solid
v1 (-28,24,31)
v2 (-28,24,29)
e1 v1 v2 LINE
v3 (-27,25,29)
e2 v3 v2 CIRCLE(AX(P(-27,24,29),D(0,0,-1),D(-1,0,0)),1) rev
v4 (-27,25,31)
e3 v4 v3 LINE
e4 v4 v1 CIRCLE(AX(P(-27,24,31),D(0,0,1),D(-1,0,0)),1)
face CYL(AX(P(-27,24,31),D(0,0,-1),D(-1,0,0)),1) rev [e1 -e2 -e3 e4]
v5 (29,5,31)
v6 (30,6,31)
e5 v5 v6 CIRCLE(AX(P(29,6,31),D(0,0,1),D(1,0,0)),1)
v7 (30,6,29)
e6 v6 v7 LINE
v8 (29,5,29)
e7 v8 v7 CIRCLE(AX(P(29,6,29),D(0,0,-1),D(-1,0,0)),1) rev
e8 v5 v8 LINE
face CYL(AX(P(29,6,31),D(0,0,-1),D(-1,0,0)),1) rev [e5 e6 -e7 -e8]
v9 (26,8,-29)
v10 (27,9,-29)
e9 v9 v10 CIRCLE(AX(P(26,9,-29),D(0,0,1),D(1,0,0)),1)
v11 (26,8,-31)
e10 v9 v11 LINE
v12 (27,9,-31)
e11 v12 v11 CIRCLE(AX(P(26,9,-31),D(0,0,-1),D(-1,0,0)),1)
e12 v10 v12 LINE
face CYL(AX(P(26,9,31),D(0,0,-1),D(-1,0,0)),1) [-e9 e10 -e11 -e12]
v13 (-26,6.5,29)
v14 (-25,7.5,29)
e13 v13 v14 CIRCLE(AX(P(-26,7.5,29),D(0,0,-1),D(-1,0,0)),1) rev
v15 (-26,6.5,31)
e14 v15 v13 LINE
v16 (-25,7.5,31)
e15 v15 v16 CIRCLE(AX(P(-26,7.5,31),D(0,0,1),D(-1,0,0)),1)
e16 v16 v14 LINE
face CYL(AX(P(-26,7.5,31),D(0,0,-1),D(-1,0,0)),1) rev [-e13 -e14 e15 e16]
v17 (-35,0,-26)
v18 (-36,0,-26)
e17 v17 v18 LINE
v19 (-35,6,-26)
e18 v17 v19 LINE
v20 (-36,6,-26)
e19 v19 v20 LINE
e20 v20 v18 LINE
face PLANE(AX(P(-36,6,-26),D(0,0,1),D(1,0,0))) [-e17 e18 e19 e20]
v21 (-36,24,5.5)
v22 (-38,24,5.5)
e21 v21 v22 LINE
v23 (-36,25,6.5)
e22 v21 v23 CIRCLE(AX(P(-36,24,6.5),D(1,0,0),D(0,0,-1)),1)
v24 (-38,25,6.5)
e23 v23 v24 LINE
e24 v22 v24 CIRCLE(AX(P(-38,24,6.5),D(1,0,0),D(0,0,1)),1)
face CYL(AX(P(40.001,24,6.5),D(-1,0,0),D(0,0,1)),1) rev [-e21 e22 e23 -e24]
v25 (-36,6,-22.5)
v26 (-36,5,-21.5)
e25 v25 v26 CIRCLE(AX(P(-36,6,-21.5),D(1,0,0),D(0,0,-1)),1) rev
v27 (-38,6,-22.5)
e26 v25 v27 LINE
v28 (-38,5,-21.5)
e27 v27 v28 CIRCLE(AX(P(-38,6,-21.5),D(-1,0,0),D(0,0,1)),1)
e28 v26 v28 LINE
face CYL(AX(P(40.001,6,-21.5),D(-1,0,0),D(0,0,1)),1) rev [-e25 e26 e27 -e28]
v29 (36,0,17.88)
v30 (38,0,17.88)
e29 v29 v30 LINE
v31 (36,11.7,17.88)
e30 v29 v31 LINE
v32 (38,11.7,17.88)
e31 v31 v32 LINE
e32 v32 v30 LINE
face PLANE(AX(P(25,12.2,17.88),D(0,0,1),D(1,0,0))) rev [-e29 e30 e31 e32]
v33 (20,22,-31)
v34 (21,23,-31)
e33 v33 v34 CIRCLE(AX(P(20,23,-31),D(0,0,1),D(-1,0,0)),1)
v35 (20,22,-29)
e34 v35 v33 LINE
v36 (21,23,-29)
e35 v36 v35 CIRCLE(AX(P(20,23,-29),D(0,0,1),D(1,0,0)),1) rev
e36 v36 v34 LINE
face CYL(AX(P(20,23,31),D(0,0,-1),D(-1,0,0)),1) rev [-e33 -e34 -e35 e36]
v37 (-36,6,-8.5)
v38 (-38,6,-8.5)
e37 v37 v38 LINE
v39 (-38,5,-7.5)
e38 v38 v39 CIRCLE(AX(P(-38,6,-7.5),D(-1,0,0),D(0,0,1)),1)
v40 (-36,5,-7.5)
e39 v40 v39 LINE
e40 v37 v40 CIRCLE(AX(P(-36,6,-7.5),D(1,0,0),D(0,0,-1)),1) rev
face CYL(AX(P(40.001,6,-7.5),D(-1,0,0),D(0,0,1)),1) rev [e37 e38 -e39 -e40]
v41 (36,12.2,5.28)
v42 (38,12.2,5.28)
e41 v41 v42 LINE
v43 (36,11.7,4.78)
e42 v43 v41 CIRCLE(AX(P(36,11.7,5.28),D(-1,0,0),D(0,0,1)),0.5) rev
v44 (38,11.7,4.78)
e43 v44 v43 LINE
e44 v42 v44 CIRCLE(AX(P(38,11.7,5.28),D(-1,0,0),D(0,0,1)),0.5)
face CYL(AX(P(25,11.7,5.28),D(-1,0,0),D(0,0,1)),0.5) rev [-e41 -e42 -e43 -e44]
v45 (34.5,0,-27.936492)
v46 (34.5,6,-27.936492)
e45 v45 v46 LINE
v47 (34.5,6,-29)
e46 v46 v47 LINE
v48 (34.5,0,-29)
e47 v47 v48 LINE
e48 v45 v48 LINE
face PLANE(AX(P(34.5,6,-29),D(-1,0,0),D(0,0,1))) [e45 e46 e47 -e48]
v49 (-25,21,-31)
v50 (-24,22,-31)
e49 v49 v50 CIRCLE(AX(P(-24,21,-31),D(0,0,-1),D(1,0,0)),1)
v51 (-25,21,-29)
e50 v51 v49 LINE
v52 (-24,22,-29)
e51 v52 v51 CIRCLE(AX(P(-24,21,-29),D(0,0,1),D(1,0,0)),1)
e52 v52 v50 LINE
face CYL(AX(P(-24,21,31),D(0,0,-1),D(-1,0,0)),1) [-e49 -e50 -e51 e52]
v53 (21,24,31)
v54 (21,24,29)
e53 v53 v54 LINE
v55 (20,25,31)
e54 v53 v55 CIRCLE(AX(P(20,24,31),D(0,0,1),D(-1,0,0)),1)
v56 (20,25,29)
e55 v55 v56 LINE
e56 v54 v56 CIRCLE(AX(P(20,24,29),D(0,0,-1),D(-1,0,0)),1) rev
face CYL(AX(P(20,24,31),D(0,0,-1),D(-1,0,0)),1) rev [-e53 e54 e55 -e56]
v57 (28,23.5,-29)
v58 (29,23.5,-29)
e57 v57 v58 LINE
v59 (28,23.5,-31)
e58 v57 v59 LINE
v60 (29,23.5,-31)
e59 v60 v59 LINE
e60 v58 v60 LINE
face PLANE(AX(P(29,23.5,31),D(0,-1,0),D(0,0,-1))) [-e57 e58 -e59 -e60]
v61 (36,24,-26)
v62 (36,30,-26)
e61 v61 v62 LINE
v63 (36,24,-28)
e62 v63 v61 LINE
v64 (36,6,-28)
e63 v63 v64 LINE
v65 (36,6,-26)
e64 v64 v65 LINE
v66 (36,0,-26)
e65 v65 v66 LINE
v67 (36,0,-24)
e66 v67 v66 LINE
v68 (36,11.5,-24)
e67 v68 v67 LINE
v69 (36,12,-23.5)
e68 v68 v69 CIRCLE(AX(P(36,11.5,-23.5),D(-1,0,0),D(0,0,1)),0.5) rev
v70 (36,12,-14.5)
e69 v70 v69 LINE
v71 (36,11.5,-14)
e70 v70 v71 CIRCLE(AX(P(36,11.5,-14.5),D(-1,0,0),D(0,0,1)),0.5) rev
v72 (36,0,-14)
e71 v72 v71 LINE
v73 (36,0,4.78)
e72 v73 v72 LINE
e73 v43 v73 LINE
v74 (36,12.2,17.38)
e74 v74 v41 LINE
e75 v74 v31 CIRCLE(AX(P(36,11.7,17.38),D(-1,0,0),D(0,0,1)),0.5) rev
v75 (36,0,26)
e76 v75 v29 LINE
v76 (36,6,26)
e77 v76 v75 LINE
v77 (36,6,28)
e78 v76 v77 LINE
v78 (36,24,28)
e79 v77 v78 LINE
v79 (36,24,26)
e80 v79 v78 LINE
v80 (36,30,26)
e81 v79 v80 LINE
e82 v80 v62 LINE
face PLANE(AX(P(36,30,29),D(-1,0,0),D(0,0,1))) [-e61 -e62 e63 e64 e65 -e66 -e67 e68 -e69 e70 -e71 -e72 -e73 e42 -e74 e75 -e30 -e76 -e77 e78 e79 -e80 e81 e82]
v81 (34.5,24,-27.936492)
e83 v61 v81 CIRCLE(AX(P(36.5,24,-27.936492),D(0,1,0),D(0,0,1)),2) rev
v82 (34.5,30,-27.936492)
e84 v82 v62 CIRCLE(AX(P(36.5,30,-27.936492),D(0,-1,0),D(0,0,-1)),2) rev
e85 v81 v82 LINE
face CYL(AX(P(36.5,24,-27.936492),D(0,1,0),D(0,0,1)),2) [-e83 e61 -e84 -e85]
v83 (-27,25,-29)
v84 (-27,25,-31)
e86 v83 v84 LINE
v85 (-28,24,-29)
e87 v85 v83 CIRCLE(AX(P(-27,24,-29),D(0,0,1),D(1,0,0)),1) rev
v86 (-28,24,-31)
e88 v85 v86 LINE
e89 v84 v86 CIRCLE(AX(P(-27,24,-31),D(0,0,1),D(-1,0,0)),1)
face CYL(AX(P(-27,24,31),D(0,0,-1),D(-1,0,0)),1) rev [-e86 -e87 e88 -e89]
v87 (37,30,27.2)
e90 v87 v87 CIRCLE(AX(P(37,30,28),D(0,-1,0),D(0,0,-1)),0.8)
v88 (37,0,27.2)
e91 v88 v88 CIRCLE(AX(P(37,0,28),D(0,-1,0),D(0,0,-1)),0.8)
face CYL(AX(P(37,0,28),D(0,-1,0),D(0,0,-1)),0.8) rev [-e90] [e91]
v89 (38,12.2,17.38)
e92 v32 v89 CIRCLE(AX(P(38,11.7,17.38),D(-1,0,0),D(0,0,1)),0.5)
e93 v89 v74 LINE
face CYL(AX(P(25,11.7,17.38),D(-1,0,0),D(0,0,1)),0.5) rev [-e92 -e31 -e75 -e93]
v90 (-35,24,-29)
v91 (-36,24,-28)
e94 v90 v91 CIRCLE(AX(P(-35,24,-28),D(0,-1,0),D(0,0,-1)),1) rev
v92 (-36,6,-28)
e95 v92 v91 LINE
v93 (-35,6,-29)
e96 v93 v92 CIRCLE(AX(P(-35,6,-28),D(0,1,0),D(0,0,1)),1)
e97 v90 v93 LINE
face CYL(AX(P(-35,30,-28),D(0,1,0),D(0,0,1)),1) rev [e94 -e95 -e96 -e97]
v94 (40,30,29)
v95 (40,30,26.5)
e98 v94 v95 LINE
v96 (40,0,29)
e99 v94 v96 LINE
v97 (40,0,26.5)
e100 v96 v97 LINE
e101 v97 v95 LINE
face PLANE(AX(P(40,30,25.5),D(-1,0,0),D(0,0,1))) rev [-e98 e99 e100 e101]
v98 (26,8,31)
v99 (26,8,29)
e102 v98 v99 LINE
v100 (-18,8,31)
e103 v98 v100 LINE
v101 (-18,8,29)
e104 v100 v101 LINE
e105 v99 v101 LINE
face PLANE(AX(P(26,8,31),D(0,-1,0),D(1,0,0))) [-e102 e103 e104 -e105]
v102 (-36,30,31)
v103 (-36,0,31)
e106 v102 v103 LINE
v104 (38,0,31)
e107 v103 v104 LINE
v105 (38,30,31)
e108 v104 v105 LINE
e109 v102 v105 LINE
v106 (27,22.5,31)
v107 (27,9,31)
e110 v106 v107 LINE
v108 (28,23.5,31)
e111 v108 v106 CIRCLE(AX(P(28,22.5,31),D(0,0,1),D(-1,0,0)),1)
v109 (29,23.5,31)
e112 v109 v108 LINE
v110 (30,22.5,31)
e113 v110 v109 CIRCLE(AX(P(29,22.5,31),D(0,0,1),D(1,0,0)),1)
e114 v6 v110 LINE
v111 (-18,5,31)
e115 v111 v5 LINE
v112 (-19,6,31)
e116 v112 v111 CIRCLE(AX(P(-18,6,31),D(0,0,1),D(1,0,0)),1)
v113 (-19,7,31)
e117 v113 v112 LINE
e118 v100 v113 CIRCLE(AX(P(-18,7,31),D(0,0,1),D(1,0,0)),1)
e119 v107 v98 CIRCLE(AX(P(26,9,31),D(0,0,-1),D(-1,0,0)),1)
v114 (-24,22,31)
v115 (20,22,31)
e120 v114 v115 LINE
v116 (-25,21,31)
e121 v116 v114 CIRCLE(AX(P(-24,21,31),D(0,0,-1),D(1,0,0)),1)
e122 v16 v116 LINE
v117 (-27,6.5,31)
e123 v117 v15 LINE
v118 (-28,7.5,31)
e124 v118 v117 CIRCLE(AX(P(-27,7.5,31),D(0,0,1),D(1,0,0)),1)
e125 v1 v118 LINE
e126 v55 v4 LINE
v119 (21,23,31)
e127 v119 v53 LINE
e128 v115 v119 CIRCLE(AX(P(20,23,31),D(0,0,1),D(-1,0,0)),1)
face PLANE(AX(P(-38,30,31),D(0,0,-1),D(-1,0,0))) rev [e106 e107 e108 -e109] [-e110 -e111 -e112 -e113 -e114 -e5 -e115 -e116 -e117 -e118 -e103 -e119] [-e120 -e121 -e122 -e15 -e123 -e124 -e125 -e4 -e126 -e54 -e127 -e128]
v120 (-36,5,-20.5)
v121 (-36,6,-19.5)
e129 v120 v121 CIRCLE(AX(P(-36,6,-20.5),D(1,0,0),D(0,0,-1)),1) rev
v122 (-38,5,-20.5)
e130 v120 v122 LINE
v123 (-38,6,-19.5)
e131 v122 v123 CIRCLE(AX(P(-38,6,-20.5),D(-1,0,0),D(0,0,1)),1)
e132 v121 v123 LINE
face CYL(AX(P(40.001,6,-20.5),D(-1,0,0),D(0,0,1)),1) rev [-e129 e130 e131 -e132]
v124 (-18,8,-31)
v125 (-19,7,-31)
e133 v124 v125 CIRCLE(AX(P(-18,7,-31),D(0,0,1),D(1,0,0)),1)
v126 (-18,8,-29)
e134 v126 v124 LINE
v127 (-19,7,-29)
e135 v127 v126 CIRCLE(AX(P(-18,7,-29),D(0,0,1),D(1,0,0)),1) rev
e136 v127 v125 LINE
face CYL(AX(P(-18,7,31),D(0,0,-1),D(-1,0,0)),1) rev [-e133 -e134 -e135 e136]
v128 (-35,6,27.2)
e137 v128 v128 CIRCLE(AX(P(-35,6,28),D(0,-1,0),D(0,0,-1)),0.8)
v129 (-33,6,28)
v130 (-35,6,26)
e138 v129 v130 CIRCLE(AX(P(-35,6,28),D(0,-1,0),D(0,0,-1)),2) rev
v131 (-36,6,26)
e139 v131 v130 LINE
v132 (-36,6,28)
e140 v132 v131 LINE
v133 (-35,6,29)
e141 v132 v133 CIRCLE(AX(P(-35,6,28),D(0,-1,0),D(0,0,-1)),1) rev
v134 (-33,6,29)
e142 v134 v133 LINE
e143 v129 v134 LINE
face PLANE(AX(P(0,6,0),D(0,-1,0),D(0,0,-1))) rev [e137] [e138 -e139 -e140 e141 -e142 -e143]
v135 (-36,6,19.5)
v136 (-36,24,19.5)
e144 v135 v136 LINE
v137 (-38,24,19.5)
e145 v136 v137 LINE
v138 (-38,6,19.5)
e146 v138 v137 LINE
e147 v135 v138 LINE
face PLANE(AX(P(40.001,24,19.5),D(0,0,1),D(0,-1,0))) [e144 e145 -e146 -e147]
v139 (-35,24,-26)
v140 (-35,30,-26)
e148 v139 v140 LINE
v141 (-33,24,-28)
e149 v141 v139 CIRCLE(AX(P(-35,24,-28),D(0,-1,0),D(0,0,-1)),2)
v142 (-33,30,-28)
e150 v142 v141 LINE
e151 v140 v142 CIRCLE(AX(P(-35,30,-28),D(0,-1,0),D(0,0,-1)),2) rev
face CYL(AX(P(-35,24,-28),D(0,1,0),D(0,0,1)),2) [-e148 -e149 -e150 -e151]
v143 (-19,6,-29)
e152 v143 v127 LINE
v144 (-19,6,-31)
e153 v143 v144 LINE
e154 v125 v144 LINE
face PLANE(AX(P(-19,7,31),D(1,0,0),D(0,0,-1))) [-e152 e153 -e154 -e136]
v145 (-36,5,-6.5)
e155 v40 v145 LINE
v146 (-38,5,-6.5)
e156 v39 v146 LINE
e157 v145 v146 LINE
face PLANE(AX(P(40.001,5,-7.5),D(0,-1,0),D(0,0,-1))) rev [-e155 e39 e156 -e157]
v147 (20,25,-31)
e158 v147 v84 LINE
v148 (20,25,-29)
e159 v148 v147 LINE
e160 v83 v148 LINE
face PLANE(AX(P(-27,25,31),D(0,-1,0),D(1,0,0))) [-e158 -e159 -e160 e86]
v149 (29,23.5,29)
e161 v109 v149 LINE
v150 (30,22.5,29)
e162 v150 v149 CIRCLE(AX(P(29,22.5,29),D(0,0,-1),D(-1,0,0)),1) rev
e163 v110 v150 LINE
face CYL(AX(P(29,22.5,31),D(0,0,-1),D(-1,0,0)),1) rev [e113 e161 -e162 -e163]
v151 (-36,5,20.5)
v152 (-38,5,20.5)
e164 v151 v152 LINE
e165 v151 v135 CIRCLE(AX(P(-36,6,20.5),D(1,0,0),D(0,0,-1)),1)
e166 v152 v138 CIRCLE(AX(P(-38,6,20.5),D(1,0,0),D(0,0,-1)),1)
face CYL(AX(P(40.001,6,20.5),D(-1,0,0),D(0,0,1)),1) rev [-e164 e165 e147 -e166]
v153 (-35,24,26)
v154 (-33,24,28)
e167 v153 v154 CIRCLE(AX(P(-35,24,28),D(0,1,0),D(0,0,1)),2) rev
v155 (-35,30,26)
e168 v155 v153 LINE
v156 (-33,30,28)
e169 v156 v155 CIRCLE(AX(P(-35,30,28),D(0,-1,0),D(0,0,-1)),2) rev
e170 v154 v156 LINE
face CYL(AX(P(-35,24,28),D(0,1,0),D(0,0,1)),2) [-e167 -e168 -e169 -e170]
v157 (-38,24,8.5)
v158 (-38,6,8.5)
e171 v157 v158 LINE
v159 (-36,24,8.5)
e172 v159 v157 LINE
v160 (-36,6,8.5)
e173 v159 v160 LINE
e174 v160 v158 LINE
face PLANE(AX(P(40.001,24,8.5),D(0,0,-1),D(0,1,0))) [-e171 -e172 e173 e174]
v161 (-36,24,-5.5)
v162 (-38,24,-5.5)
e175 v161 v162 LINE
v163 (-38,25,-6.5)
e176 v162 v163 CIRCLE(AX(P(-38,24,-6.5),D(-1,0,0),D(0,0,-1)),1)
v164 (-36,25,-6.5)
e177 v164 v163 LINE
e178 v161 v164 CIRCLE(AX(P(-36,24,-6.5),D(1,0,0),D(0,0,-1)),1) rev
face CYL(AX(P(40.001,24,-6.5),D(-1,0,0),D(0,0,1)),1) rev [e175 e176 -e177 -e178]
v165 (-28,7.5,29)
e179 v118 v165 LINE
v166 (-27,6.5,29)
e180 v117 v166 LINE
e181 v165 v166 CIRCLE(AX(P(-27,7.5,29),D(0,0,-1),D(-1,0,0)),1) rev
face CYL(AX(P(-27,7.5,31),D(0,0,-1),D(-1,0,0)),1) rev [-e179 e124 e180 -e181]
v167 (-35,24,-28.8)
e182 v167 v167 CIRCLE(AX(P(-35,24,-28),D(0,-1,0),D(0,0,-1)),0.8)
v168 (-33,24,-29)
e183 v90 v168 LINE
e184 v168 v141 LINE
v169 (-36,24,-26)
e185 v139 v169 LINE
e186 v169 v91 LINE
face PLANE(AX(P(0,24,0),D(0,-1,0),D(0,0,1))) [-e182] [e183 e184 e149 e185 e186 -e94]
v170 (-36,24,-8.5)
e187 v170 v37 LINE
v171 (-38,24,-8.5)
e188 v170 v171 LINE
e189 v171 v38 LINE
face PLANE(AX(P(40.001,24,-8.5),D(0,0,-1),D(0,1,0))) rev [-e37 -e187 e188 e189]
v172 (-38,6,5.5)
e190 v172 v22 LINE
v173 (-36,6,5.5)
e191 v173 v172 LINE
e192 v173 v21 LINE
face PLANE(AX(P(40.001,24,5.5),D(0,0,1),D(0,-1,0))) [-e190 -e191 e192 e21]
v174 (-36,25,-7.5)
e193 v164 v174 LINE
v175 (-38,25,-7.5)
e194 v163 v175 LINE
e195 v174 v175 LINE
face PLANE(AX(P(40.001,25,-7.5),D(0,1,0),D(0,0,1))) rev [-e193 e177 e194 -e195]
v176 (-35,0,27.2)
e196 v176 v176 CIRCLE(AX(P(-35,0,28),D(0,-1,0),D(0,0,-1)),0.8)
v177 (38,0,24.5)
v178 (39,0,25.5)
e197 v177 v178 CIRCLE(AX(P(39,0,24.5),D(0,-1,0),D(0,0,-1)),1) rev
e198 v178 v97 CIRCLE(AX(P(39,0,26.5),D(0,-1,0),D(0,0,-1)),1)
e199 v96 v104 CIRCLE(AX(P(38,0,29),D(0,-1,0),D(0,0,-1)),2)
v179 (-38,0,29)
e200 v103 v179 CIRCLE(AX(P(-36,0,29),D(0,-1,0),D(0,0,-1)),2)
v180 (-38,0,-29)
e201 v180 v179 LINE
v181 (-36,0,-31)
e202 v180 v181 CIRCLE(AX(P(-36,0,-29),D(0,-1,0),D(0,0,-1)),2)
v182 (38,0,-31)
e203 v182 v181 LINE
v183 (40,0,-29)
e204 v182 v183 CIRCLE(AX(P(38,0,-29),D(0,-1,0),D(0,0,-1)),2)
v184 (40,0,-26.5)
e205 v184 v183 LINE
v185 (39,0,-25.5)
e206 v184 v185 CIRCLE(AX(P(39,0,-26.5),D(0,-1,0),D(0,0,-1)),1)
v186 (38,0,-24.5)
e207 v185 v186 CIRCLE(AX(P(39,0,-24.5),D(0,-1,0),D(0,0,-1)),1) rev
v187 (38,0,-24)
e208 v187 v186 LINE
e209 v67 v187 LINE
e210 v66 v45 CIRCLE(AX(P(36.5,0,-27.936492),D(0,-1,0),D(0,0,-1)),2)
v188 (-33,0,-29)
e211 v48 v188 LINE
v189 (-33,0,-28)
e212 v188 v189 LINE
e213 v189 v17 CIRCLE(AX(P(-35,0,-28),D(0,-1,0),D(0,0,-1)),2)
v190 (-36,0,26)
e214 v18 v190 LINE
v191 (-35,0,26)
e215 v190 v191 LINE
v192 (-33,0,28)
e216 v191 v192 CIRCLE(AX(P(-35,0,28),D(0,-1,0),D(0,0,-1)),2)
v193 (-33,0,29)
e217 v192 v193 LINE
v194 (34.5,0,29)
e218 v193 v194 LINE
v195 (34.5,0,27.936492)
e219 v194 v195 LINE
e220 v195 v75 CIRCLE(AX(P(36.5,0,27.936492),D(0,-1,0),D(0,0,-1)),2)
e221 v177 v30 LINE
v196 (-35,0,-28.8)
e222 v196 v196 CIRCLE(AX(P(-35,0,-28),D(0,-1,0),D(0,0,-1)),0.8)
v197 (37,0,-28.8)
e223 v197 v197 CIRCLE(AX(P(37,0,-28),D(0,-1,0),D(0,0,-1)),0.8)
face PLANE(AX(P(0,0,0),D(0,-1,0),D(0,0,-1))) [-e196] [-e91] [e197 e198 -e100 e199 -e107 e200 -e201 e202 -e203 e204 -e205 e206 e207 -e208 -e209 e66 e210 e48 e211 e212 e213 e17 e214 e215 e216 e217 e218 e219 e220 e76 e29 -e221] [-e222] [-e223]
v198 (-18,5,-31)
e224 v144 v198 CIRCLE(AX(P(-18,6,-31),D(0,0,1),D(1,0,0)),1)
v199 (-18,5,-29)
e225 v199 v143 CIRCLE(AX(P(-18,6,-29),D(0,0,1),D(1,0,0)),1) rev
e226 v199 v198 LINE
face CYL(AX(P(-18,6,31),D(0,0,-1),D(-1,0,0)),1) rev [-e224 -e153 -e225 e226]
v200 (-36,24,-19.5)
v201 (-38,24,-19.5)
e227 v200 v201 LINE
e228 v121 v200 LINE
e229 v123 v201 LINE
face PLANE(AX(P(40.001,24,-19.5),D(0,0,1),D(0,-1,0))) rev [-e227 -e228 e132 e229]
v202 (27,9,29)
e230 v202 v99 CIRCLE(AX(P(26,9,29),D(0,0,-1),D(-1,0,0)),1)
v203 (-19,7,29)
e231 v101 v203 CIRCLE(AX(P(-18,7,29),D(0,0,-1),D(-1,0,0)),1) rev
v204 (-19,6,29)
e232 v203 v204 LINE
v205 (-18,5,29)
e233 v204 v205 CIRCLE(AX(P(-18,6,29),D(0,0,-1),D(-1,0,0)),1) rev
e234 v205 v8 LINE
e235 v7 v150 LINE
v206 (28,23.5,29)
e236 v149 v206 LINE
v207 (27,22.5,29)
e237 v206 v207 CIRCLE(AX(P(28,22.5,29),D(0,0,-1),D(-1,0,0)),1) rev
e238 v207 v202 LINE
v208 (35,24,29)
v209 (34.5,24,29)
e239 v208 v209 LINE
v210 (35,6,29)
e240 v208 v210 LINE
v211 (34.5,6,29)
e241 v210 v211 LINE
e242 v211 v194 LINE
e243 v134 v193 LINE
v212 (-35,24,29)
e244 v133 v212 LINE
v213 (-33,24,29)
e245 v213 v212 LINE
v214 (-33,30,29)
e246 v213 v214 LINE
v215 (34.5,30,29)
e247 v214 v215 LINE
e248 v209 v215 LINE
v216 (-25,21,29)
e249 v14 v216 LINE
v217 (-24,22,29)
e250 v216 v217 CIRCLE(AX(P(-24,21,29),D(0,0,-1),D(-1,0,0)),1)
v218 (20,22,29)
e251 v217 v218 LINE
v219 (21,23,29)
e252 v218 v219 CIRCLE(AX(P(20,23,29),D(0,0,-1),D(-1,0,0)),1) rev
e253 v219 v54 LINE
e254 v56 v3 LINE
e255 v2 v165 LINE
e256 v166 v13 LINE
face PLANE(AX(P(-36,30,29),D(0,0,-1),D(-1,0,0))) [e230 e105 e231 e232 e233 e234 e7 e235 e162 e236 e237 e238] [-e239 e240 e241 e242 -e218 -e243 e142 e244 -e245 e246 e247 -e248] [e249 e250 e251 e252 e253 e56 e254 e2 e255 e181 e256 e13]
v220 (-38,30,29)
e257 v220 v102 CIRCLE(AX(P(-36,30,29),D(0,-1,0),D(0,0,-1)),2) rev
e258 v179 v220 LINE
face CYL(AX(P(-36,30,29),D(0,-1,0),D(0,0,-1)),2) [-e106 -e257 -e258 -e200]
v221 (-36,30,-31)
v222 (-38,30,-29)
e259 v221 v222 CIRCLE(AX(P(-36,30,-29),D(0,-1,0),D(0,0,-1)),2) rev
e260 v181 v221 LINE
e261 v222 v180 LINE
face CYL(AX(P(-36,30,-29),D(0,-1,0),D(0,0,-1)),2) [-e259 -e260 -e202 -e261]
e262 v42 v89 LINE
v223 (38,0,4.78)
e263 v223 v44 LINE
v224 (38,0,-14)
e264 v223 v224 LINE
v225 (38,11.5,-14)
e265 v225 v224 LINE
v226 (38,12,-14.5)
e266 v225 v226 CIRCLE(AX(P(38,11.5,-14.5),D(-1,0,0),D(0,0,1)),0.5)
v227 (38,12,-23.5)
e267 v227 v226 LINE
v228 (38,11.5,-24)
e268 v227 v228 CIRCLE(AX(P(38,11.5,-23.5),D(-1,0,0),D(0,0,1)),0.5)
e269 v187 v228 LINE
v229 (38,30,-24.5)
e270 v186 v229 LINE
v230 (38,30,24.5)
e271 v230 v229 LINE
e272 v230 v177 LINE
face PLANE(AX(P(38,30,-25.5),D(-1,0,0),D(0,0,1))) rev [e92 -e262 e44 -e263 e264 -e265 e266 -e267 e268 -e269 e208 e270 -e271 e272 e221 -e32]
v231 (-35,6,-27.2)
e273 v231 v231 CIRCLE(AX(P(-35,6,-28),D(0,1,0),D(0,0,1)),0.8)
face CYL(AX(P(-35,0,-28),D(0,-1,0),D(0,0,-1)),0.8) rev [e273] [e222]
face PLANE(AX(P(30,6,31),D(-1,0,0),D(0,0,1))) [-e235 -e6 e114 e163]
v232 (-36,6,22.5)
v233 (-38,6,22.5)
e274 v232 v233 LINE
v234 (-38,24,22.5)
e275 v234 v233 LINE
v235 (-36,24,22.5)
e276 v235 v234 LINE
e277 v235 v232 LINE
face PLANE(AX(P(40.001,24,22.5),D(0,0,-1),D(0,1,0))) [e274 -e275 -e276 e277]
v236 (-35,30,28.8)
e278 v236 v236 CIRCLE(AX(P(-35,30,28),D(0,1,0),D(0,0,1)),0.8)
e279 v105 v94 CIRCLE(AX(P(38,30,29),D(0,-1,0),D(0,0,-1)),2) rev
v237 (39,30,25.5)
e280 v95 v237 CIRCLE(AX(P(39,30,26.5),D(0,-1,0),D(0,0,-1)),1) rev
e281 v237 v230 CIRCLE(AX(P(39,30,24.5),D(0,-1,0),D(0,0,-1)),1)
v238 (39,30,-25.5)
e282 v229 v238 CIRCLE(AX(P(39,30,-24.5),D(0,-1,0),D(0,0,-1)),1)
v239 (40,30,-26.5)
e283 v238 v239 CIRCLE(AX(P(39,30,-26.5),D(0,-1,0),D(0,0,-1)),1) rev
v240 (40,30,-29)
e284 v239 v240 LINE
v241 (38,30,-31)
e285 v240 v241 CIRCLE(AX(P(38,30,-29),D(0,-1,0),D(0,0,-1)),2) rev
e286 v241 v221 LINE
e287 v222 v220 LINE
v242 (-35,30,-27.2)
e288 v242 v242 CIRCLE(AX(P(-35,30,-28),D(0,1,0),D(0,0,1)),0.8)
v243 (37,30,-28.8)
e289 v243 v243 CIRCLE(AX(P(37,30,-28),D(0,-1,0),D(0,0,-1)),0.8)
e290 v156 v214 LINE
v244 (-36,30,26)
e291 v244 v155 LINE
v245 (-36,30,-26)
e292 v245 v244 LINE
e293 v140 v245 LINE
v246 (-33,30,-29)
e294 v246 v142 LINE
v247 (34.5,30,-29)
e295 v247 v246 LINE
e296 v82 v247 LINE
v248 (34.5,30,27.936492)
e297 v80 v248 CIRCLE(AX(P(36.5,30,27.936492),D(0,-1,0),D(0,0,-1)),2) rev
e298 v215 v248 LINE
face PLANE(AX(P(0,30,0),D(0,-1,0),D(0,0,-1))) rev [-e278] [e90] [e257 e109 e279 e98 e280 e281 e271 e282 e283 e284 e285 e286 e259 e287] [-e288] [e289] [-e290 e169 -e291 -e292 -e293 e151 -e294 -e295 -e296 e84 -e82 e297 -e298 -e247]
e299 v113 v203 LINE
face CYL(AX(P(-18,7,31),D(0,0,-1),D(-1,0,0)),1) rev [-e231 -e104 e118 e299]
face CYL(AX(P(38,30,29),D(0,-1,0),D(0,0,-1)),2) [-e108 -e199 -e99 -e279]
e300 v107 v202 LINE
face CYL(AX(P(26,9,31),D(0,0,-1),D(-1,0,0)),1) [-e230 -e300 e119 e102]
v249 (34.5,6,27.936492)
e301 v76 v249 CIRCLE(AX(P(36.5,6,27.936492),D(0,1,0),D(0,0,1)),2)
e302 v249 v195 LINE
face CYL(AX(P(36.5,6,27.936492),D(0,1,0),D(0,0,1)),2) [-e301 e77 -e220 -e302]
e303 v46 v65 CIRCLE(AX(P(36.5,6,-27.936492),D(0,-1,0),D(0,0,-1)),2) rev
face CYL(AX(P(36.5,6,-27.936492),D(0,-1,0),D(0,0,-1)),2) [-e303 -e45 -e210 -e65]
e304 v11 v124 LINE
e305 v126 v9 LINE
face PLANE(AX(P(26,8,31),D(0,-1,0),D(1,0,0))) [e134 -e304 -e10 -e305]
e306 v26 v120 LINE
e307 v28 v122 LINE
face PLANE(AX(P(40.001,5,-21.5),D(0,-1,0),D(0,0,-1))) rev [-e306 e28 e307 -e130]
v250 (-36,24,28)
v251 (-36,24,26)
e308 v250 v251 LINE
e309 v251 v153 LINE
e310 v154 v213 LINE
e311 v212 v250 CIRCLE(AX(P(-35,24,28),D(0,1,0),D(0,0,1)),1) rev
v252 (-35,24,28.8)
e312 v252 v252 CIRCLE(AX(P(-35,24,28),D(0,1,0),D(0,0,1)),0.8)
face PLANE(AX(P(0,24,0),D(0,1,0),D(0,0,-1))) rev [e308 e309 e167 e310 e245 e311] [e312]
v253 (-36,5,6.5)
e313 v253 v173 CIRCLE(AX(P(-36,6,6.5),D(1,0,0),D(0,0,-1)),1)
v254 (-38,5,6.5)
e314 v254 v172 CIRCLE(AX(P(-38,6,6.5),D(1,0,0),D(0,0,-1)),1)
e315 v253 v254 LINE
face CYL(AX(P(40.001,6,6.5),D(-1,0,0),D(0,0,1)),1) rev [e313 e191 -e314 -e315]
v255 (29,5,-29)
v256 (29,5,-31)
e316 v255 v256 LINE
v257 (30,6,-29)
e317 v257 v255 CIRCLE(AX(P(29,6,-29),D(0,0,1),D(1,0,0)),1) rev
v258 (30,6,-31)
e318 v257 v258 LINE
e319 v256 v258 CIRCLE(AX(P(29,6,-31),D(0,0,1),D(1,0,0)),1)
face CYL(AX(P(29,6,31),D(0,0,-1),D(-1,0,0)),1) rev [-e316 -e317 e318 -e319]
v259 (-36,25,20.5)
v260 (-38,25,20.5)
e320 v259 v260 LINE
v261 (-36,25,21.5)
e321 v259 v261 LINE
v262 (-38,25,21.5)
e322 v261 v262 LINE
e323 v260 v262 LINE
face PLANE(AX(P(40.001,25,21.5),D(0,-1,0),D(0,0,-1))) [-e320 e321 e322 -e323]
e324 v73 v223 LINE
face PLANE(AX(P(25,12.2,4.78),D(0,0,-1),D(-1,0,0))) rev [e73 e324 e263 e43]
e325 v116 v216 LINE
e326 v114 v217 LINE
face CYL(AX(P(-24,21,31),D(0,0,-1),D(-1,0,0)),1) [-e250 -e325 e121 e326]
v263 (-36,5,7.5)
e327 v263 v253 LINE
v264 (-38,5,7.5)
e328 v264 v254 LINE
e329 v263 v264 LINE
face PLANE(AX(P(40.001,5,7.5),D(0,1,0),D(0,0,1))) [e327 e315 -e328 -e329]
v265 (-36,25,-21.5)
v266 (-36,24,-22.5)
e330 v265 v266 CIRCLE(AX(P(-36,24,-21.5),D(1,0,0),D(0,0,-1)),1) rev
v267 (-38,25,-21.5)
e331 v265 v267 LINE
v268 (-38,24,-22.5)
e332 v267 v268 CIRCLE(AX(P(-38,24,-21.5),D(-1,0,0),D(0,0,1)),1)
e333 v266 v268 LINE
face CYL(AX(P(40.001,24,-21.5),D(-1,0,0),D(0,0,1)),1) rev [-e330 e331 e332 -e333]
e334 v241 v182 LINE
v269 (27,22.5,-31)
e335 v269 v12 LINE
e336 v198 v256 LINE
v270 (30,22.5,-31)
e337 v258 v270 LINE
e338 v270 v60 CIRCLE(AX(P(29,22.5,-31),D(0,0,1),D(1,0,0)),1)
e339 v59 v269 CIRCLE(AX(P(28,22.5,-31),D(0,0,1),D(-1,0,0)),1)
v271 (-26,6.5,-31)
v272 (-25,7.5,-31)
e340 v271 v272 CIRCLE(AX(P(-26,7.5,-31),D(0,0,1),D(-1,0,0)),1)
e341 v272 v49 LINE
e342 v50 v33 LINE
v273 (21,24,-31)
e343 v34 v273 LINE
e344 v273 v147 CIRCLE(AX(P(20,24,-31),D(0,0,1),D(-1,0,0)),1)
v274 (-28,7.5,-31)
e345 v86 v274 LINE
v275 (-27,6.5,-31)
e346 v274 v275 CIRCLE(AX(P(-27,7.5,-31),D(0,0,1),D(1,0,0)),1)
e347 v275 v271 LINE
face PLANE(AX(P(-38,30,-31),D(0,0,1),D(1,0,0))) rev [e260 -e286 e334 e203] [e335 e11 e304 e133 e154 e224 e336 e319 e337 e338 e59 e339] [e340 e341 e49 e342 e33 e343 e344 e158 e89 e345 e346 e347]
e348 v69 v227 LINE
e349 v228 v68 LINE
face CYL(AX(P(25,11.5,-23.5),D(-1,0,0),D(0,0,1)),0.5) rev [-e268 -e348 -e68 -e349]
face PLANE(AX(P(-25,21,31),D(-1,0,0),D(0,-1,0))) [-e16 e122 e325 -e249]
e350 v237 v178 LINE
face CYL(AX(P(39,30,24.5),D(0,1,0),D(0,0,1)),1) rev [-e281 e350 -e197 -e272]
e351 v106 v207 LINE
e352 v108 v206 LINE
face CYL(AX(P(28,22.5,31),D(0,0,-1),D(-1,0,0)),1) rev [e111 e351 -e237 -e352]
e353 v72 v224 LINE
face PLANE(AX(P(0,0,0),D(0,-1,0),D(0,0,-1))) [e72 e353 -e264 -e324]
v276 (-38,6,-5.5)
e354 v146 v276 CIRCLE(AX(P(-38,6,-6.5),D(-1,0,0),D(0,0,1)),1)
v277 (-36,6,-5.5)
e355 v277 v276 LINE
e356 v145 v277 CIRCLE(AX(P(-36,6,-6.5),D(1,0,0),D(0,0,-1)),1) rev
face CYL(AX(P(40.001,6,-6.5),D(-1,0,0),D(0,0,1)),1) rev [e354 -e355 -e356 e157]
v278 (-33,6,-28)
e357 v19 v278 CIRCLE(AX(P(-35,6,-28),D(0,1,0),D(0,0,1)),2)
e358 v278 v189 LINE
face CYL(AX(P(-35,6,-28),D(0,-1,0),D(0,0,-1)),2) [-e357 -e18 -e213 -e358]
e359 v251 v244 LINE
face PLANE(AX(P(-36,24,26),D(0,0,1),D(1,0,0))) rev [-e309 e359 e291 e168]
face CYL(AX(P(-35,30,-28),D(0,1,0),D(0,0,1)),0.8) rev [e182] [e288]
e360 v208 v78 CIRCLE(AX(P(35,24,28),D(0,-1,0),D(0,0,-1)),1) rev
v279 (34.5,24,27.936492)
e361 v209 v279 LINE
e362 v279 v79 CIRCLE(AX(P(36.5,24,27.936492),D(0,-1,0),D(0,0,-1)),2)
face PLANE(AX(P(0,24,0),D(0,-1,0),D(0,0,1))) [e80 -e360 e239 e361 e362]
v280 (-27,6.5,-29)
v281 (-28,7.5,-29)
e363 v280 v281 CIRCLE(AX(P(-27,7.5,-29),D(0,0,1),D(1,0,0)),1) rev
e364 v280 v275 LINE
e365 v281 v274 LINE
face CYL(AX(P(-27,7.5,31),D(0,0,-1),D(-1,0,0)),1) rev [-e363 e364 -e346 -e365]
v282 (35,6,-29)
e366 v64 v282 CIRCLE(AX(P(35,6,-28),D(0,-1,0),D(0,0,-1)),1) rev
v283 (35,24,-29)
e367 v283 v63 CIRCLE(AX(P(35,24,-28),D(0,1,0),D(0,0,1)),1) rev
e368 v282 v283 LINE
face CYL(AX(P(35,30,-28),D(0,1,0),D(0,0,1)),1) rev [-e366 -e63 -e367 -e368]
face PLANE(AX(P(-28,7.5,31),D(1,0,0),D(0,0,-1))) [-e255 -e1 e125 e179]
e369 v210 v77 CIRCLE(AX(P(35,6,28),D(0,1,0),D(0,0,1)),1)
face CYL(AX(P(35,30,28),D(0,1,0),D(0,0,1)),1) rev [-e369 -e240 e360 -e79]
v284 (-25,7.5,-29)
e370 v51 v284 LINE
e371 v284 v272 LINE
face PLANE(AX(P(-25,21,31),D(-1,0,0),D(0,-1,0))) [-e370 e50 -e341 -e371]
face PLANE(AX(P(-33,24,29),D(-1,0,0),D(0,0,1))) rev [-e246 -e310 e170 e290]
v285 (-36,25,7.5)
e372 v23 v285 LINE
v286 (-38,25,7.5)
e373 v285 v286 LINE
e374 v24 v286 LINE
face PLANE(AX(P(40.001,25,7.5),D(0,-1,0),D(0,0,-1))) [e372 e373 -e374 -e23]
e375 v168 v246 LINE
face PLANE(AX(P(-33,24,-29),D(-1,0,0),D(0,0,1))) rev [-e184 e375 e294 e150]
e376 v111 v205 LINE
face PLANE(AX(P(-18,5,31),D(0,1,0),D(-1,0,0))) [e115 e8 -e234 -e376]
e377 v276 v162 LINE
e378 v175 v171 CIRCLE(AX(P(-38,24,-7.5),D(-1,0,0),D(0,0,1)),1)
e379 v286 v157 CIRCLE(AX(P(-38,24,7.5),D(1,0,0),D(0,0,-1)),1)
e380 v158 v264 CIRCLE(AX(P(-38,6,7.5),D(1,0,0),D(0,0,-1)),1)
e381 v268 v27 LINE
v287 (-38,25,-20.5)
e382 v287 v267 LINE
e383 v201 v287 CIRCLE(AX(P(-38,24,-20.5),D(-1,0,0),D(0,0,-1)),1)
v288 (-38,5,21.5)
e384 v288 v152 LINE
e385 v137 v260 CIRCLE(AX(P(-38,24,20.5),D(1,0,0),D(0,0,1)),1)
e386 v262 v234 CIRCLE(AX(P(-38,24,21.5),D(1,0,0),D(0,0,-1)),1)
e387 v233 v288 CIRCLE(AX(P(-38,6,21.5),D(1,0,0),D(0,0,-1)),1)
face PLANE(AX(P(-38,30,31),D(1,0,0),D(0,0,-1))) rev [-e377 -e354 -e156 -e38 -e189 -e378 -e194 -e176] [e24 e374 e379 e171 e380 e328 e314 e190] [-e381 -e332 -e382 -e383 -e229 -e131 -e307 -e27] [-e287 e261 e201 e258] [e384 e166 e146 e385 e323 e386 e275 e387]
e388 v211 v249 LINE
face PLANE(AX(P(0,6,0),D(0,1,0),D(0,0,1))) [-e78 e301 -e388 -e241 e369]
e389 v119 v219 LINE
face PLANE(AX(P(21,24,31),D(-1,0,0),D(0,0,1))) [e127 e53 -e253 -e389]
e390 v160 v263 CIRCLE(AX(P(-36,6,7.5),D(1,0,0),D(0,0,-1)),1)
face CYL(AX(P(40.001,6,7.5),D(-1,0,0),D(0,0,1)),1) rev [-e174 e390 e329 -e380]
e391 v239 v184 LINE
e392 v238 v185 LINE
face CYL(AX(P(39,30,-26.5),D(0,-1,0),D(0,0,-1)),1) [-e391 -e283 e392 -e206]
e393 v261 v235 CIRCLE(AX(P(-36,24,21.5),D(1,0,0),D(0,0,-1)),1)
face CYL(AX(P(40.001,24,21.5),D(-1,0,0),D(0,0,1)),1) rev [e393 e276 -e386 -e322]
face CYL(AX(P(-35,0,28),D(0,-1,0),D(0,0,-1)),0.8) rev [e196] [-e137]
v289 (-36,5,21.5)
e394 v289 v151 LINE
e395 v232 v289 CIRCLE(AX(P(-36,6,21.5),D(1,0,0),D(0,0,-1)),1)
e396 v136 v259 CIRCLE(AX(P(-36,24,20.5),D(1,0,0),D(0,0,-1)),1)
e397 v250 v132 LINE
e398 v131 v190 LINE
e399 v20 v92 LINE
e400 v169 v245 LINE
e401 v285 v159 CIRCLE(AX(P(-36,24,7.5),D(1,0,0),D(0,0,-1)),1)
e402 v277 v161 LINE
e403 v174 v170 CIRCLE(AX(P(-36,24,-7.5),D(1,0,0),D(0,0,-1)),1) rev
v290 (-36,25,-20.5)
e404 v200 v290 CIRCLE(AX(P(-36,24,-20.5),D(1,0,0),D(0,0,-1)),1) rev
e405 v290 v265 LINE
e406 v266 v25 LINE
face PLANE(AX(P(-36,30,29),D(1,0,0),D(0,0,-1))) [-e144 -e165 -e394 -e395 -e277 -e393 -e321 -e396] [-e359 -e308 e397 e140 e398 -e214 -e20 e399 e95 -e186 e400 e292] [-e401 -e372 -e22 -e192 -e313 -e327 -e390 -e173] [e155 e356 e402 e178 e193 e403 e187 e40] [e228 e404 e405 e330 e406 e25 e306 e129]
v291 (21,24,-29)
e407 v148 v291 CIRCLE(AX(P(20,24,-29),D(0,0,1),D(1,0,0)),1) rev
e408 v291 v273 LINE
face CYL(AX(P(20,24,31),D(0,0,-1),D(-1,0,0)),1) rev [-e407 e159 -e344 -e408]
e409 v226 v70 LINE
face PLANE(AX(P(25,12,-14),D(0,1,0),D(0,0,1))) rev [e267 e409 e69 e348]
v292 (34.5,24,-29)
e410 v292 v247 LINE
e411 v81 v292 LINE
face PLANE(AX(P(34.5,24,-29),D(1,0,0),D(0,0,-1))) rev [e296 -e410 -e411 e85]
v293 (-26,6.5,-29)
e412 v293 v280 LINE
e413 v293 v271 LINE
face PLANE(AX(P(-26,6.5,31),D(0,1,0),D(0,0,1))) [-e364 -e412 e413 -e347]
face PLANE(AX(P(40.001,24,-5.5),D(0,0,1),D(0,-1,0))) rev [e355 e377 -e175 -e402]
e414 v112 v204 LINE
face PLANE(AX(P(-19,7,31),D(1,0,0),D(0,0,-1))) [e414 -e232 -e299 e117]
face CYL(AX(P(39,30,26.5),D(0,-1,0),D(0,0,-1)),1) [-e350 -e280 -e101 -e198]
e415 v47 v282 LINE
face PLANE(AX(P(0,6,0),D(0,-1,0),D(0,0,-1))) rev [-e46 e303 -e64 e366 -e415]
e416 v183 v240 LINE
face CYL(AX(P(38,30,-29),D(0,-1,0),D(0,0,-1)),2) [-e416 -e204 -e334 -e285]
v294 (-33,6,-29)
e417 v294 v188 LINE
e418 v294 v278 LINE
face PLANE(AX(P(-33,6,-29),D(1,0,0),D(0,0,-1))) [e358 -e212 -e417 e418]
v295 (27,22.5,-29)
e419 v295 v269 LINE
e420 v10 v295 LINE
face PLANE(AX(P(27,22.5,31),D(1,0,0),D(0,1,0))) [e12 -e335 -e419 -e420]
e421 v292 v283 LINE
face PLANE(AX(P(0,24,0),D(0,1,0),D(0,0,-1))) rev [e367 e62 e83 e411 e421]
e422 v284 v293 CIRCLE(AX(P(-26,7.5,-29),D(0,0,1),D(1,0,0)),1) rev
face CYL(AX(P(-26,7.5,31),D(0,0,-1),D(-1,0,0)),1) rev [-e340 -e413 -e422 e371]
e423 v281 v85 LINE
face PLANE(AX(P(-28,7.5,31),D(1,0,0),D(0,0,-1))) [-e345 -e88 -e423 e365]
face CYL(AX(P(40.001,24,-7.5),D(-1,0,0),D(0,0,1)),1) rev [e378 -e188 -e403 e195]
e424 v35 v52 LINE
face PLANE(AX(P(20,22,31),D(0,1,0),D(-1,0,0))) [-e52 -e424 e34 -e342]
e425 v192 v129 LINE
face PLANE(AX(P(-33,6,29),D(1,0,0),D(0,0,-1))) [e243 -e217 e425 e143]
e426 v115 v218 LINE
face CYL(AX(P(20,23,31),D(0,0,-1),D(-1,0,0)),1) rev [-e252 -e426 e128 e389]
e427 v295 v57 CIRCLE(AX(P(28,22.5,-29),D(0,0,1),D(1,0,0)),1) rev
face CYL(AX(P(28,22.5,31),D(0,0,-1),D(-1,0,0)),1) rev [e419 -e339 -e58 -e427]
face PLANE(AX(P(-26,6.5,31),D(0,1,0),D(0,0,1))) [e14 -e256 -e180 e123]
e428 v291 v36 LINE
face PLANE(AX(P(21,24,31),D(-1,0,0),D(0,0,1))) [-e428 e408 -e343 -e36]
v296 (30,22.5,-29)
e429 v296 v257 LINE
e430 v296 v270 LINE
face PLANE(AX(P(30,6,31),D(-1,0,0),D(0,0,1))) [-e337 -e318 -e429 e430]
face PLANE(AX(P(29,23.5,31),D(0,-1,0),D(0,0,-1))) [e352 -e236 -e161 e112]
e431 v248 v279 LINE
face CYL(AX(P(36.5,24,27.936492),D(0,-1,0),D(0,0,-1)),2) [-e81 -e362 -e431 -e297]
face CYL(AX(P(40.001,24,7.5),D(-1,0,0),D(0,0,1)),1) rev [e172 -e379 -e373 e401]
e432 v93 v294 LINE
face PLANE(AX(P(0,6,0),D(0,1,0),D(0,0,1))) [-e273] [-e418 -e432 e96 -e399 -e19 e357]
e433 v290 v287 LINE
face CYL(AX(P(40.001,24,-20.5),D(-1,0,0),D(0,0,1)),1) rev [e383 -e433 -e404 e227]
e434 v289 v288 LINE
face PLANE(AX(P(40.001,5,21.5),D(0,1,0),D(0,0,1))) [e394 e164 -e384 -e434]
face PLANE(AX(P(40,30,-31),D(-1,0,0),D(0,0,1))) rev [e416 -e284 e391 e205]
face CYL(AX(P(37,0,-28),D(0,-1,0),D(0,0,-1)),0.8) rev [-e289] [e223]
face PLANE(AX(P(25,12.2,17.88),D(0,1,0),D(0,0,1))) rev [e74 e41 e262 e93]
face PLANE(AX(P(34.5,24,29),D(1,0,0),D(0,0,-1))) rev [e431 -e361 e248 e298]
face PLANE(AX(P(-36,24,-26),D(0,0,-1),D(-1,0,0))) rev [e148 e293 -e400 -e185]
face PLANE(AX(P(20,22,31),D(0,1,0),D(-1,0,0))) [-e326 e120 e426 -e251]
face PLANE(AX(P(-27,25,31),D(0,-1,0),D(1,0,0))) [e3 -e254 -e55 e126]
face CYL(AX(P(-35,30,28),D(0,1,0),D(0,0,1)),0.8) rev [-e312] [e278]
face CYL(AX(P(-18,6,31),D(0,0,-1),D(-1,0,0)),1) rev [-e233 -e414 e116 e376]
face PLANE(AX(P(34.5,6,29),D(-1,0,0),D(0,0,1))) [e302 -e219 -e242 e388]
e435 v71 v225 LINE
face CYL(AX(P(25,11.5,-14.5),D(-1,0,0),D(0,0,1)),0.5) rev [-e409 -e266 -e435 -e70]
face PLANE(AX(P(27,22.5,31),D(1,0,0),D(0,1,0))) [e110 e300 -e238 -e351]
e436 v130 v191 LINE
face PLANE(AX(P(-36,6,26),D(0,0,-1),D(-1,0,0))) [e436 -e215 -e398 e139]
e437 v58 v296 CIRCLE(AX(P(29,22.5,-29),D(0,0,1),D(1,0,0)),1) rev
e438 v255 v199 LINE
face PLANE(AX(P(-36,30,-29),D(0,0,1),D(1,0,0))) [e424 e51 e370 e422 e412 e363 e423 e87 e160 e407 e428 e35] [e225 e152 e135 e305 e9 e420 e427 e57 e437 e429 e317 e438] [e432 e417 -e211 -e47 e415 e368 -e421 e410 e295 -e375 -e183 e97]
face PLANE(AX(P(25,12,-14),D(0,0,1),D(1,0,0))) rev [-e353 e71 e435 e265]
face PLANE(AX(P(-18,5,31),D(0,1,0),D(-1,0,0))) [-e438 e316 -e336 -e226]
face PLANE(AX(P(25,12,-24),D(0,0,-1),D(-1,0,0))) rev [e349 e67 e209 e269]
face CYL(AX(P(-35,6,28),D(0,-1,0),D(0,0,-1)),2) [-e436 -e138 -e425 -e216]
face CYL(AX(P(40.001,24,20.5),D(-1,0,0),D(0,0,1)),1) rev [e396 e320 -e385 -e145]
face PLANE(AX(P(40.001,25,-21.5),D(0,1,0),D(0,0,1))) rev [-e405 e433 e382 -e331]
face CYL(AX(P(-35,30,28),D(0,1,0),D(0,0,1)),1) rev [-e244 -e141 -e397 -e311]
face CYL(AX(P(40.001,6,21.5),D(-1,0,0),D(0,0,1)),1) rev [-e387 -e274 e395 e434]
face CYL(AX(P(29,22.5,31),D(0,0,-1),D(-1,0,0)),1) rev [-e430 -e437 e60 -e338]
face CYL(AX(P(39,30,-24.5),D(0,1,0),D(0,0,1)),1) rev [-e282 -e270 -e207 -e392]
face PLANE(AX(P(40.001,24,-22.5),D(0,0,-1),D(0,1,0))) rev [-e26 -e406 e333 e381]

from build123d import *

# Parameters (mm, degrees)
SKETCH4_W             = 72
SKETCH4_H             = 58
BOSS_EXTRUDE3_DEPTH   = 30
SKETCH5_W             = 13.1
SKETCH5_H             = 12.2
SKETCH5_W_2           = 10
SKETCH5_H_2           = 12
CUT_EXTRUDE2_DEPTH    = 13
CUT_EXTRUDE4_REACH    = 91.135
CUT_EXTRUDE3_DEPTH    = 80.649231007
SKETCH21_W            = 3
SKETCH21_H            = 3
SKETCH21_W_2          = 1.5
BOSS_EXTRUDE5_DEPTH   = 6
M2_TAPPED_HOLE1_D     = 1.6
M2_TAPPED_HOLE1_DEPTH = 30
FILLET1_R             = 1
FILLET4_R             = 0.5
FILLET5_R             = 2


# Some blends are built 0.0001 mm under size
with BuildPart() as part:
    # Sketch4 → Boss-Extrude3 (new body)
    with BuildSketch(Plane(origin=(0, 0, 0), x_dir=(1, 0, 0), z_dir=(0, 1, 0))):
        Polygon((-38, -31), (40, -31), (40, -25.5), (38, -25.5), (38, 25.5), (40, 25.5), (40, 31), (-38, 31), align=None)
        Rectangle(SKETCH4_W, SKETCH4_H, mode=Mode.SUBTRACT)
    extrude(amount=BOSS_EXTRUDE3_DEPTH)

    # Sketch5 → Cut-Extrude2 (cut)
    with BuildSketch(Plane(origin=(38, 0, 0), x_dir=(0, 0, -1), z_dir=(1, 0, 0))):
        with Locations((-11.33, 6.1)):
            Rectangle(SKETCH5_W, SKETCH5_H)
        with Locations((19, 6)):
            Rectangle(SKETCH5_W_2, SKETCH5_H_2)
    extrude(amount=-CUT_EXTRUDE2_DEPTH, mode=Mode.SUBTRACT)

    # Sketch15 → Cut-Extrude4 (cut, up to next)
    with BuildSketch(Plane.ZY.offset(38), mode=Mode.PRIVATE) as cut_extrude4_sk1:
        with BuildLine():
            Line((-21.5, 25), (-20.5, 25))
            ThreePointArc((-20.5, 25), (-19.792893219, 24.707106781), (-19.5, 24))
            Line((-19.5, 24), (-19.5, 6))
            ThreePointArc((-19.5, 6), (-19.792893219, 5.292893219), (-20.5, 5))
            Line((-20.5, 5), (-21.5, 5))
            ThreePointArc((-21.5, 5), (-22.207106781, 5.292893219), (-22.5, 6))
            Line((-22.5, 6), (-22.5, 24))
            ThreePointArc((-22.5, 24), (-22.207106781, 24.707106781), (-21.5, 25))
        make_face()
    cut_extrude4_tool1 = extrude(cut_extrude4_sk1.sketch, amount=-CUT_EXTRUDE4_REACH, mode=Mode.PRIVATE) & part.part
    # Sketch15 → Cut-Extrude4 (cut, up to next)
    with BuildSketch(Plane.ZY.offset(38), mode=Mode.PRIVATE) as cut_extrude4_sk2:
        with BuildLine():
            Line((-7.5, 25), (-6.5, 25))
            ThreePointArc((-6.5, 25), (-5.792893219, 24.707106781), (-5.5, 24))
            Line((-5.5, 24), (-5.5, 6))
            ThreePointArc((-5.5, 6), (-5.792893219, 5.292893219), (-6.5, 5))
            Line((-6.5, 5), (-7.5, 5))
            ThreePointArc((-7.5, 5), (-8.207106781, 5.292893219), (-8.5, 6))
            Line((-8.5, 6), (-8.5, 24))
            ThreePointArc((-8.5, 24), (-8.207106781, 24.707106781), (-7.5, 25))
        make_face()
    cut_extrude4_tool2 = extrude(cut_extrude4_sk2.sketch, amount=-CUT_EXTRUDE4_REACH, mode=Mode.PRIVATE) & part.part
    cut_extrude4_1 = cut_extrude4_tool1.solids().sort_by_distance((-38, 15, -21))[0]
    add(cut_extrude4_1, mode=Mode.SUBTRACT)
    cut_extrude4_2 = cut_extrude4_tool2.solids().sort_by_distance((-38, 15, -7))[0]
    add(cut_extrude4_2, mode=Mode.SUBTRACT)
    cut_extrude4 = cut_extrude4_1 + cut_extrude4_2  # Cut-Extrude4 as one shape, for the pattern or mirror that repeats it

    # Mirror1: Cut-Extrude4 across plane
    add(cut_extrude4.mirror(Plane.XY), mode=Mode.SUBTRACT)

    # Sketch14 → Cut-Extrude3 (cut, through all)
    with BuildSketch(Plane.XY.offset(-31)):
        with BuildLine():
            Line((-28, 7.5), (-28, 24))
            ThreePointArc((-28, 24), (-27.707106781, 24.707106781), (-27, 25))
            Line((-27, 25), (20, 25))
            ThreePointArc((20, 25), (20.707106781, 24.707106781), (21, 24))
            Line((21, 24), (21, 23))
            ThreePointArc((21, 23), (20.707106781, 22.292893219), (20, 22))
            Line((20, 22), (-24, 22))
            ThreePointArc((-24, 22), (-24.707106781, 21.707106781), (-25, 21))
            Line((-25, 21), (-25, 7.5))
            ThreePointArc((-25, 7.5), (-25.292893219, 6.792893219), (-26, 6.5))
            Line((-26, 6.5), (-27, 6.5))
            ThreePointArc((-27, 6.5), (-27.707106781, 6.792893219), (-28, 7.5))
        make_face()
        with BuildLine():
            Line((27, 22.5), (27, 9))
            ThreePointArc((27, 9), (26.707106781, 8.292893219), (26, 8))
            Line((26, 8), (-18, 8))
            ThreePointArc((-18, 8), (-18.707106781, 7.707106781), (-19, 7))
            Line((-19, 7), (-19, 6))
            ThreePointArc((-19, 6), (-18.707106781, 5.292893219), (-18, 5))
            Line((-18, 5), (29, 5))
            ThreePointArc((29, 5), (29.707106781, 5.292893219), (30, 6))
            Line((30, 6), (30, 22.5))
            ThreePointArc((30, 22.5), (29.707106781, 23.207106781), (29, 23.5))
            Line((29, 23.5), (28, 23.5))
            ThreePointArc((28, 23.5), (27.292893219, 23.207106781), (27, 22.5))
        make_face()
    extrude(amount=CUT_EXTRUDE3_DEPTH, mode=Mode.SUBTRACT)

    # Sketch21 → Boss-Extrude5 (add)
    with BuildSketch(Plane.XZ):
        with Locations((-34.5, 27.5)):
            Rectangle(SKETCH21_W, SKETCH21_H)
        with Locations((35.25, 27.5)):
            Rectangle(SKETCH21_W_2, SKETCH21_H)
        with Locations((35.25, -27.5)):
            Rectangle(SKETCH21_W_2, SKETCH21_H)
        with Locations((-34.5, -27.5)):
            Rectangle(SKETCH21_W, SKETCH21_H)
    boss_extrude5 = extrude(amount=-BOSS_EXTRUDE5_DEPTH)

    # M2 Tapped Hole1
    with Locations(Plane(origin=(0, 0, 0), x_dir=(-1, 0, 0), z_dir=(0, -1, 0))):
        with Locations((35, 28), (35, -28), (-37, -28), (-37, 28)):
            m2_tapped_hole1 = Hole(M2_TAPPED_HOLE1_D / 2, depth=M2_TAPPED_HOLE1_DEPTH)

    # Fillet1
    fillet1_edges = [part.edges().sort_by_distance(p)[0] for p in [
        (-36, 18, 29),
        (-36, 18, -29),
        (36, 18, 29),
        (36, 18, -29),
        (40, 15, -25.5),
        (38, 15, -25.5),
        (38, 15, 25.5),
        (40, 15, 25.5),
    ]]
    fillet(fillet1_edges, radius=FILLET1_R - 0.0001)  # a hair under: the kernel refuses the full size

    # Fillet4
    fillet4_edges = [part.edges().sort_by_distance(p)[0] for p in [
        (37, 12.2, 4.78),
        (37, 12.2, 17.88),
        (37, 12, -24),
        (37, 12, -14),
    ]]
    fillet(fillet4_edges, radius=FILLET4_R)

    # Mirror2: Boss-Extrude5, M2 Tapped Hole1 across plane
    add(boss_extrude5.mirror(Plane(origin=(0, 15, 0), x_dir=(0, 0, 1), z_dir=(0, -1, 0))))
    add(m2_tapped_hole1.mirror(Plane(origin=(0, 15, 0), x_dir=(0, 0, 1), z_dir=(0, -1, 0))), mode=Mode.SUBTRACT)

    # Fillet5
    # the kernel refuses this fillet: 2 mm, written as the material it takes off along each edge
    with BuildSketch(Plane(origin=(40, -5, 31), x_dir=(-1, 0, 0), z_dir=(0, 1, 0)), Plane(origin=(-38, -5, 31), x_dir=(0, 0, -1), z_dir=(0, 1, 0)), Plane(origin=(-38, -5, -31), x_dir=(1, 0, 0), z_dir=(0, 1, 0)), Plane(origin=(40, -5, -31), x_dir=(0, 0, 1), z_dir=(0, 1, 0))) as fillet5_piece_1:
        with BuildLine():
            CenterArc((FILLET5_R, -FILLET5_R), FILLET5_R, 90, 90)
            Line((0, -FILLET5_R), (-FILLET5_R * 0.02, -FILLET5_R))
            Line((-FILLET5_R * 0.02, -FILLET5_R), (-FILLET5_R * 0.02, FILLET5_R * 0.02))
            Line((-FILLET5_R * 0.02, FILLET5_R * 0.02), (FILLET5_R, FILLET5_R * 0.02))
            Line((FILLET5_R, FILLET5_R * 0.02), (FILLET5_R, 0))
        make_face()
    extrude(amount=40, mode=Mode.SUBTRACT)
    with BuildSketch(Plane(origin=(-33, -5, 26), x_dir=(-1, 0, 0), z_dir=(0, 1, 0)), Plane(origin=(-33, -5, -26), x_dir=(0, 0, -1), z_dir=(0, 1, 0)), Plane(origin=(-33, 35, -26), x_dir=(-1, 0, 0), z_dir=(0, -1, 0))) as fillet5_piece_2:
        with BuildLine():
            CenterArc((FILLET5_R, FILLET5_R), FILLET5_R, 180, 90)
            Line((0, FILLET5_R), (-FILLET5_R * 0.02, FILLET5_R))
            Line((-FILLET5_R * 0.02, FILLET5_R), (-FILLET5_R * 0.02, -FILLET5_R * 0.02))
            Line((-FILLET5_R * 0.02, -FILLET5_R * 0.02), (FILLET5_R, -FILLET5_R * 0.02))
            Line((FILLET5_R, -FILLET5_R * 0.02), (FILLET5_R, 0))
        make_face()
    extrude(amount=16, mode=Mode.SUBTRACT)
    with BuildSketch(Plane(origin=(34.5, -4.841229183, 26), x_dir=(1, 0, 0), z_dir=(0, 1, 0))) as fillet5_piece_3:
        with BuildLine():
            CenterArc((2, -1.936491673), FILLET5_R, 104.477512186, 75.522487814)
            Line((0, -1.936491673), (-0.04, -1.936491673))
            Line((-0.04, -1.936491673), (-0.04, 0))
            Line((-0.04, 0), (0, 0.04))
            ThreePointArc((0, 0.04), (0.75, 0.04), (1.49, 0.038729833))
            Line((1.49, 0.038729833), (1.5, 0))
        make_face()
    extrude(amount=15.682458366, mode=Mode.SUBTRACT)
    with BuildSketch(Plane(origin=(34.5, -4.841229183, -26), x_dir=(1, 0, 0), z_dir=(0, 1, 0))) as fillet5_piece_4:
        with BuildLine():
            CenterArc((2, 1.936491673), FILLET5_R, 180, 75.522487814)
            Line((0, 1.936491673), (-0.04, 1.936491673))
            Line((-0.04, 1.936491673), (-0.04, 0))
            Line((-0.04, 0), (0, -0.04))
            ThreePointArc((0, -0.04), (0.75, -0.04), (1.49, -0.038729833))
            Line((1.49, -0.038729833), (1.5, 0))
        make_face()
    extrude(amount=15.682458366, mode=Mode.SUBTRACT)
    with BuildSketch(Plane(origin=(-33, 35, 26), x_dir=(-1, 0, 0), z_dir=(0, -1, 0))) as fillet5_piece_5:
        with BuildLine():
            CenterArc((FILLET5_R, -FILLET5_R), FILLET5_R, 90, 90)
            Line((0, -FILLET5_R), (-FILLET5_R * 0.02, -FILLET5_R))
            Line((-FILLET5_R * 0.02, -FILLET5_R), (-FILLET5_R * 0.02, FILLET5_R * 0.02))
            Line((-FILLET5_R * 0.02, FILLET5_R * 0.02), (FILLET5_R, FILLET5_R * 0.02))
            Line((FILLET5_R, FILLET5_R * 0.02), (FILLET5_R, 0))
        make_face()
    extrude(amount=16, mode=Mode.SUBTRACT)
    with BuildSketch(Plane(origin=(34.5, 34.841229183, 26), x_dir=(0, 0, 1), z_dir=(0, -1, 0))) as fillet5_piece_6:
        with BuildLine():
            CenterArc((1.936491673, -2), FILLET5_R, 90, 75.522487814)
            Line((0, -1.5), (-0.038729833, -1.49))
            ThreePointArc((-0.038729833, -1.49), (-0.04, -0.75), (-0.04, 0))
            Line((-0.04, 0), (0, 0.04))
            Line((0, 0.04), (1.936491673, 0.04))
            Line((1.936491673, 0.04), (1.936491673, 0))
        make_face()
    extrude(amount=15.682458366, mode=Mode.SUBTRACT)
    with BuildSketch(Plane(origin=(34.5, 34.841229183, -26), x_dir=(0, 0, -1), z_dir=(0, -1, 0))) as fillet5_piece_7:
        with BuildLine():
            CenterArc((1.936491673, 2), FILLET5_R, 194.477512186, 75.522487814)
            Line((0, 1.5), (-0.038729833, 1.49))
            ThreePointArc((-0.038729833, 1.49), (-0.04, 0.75), (-0.04, 0))
            Line((-0.04, 0), (0, -0.04))
            Line((0, -0.04), (1.936491673, -0.04))
            Line((1.936491673, -0.04), (1.936491673, 0))
        make_face()
    extrude(amount=15.682458366, mode=Mode.SUBTRACT)


solid = part.part
